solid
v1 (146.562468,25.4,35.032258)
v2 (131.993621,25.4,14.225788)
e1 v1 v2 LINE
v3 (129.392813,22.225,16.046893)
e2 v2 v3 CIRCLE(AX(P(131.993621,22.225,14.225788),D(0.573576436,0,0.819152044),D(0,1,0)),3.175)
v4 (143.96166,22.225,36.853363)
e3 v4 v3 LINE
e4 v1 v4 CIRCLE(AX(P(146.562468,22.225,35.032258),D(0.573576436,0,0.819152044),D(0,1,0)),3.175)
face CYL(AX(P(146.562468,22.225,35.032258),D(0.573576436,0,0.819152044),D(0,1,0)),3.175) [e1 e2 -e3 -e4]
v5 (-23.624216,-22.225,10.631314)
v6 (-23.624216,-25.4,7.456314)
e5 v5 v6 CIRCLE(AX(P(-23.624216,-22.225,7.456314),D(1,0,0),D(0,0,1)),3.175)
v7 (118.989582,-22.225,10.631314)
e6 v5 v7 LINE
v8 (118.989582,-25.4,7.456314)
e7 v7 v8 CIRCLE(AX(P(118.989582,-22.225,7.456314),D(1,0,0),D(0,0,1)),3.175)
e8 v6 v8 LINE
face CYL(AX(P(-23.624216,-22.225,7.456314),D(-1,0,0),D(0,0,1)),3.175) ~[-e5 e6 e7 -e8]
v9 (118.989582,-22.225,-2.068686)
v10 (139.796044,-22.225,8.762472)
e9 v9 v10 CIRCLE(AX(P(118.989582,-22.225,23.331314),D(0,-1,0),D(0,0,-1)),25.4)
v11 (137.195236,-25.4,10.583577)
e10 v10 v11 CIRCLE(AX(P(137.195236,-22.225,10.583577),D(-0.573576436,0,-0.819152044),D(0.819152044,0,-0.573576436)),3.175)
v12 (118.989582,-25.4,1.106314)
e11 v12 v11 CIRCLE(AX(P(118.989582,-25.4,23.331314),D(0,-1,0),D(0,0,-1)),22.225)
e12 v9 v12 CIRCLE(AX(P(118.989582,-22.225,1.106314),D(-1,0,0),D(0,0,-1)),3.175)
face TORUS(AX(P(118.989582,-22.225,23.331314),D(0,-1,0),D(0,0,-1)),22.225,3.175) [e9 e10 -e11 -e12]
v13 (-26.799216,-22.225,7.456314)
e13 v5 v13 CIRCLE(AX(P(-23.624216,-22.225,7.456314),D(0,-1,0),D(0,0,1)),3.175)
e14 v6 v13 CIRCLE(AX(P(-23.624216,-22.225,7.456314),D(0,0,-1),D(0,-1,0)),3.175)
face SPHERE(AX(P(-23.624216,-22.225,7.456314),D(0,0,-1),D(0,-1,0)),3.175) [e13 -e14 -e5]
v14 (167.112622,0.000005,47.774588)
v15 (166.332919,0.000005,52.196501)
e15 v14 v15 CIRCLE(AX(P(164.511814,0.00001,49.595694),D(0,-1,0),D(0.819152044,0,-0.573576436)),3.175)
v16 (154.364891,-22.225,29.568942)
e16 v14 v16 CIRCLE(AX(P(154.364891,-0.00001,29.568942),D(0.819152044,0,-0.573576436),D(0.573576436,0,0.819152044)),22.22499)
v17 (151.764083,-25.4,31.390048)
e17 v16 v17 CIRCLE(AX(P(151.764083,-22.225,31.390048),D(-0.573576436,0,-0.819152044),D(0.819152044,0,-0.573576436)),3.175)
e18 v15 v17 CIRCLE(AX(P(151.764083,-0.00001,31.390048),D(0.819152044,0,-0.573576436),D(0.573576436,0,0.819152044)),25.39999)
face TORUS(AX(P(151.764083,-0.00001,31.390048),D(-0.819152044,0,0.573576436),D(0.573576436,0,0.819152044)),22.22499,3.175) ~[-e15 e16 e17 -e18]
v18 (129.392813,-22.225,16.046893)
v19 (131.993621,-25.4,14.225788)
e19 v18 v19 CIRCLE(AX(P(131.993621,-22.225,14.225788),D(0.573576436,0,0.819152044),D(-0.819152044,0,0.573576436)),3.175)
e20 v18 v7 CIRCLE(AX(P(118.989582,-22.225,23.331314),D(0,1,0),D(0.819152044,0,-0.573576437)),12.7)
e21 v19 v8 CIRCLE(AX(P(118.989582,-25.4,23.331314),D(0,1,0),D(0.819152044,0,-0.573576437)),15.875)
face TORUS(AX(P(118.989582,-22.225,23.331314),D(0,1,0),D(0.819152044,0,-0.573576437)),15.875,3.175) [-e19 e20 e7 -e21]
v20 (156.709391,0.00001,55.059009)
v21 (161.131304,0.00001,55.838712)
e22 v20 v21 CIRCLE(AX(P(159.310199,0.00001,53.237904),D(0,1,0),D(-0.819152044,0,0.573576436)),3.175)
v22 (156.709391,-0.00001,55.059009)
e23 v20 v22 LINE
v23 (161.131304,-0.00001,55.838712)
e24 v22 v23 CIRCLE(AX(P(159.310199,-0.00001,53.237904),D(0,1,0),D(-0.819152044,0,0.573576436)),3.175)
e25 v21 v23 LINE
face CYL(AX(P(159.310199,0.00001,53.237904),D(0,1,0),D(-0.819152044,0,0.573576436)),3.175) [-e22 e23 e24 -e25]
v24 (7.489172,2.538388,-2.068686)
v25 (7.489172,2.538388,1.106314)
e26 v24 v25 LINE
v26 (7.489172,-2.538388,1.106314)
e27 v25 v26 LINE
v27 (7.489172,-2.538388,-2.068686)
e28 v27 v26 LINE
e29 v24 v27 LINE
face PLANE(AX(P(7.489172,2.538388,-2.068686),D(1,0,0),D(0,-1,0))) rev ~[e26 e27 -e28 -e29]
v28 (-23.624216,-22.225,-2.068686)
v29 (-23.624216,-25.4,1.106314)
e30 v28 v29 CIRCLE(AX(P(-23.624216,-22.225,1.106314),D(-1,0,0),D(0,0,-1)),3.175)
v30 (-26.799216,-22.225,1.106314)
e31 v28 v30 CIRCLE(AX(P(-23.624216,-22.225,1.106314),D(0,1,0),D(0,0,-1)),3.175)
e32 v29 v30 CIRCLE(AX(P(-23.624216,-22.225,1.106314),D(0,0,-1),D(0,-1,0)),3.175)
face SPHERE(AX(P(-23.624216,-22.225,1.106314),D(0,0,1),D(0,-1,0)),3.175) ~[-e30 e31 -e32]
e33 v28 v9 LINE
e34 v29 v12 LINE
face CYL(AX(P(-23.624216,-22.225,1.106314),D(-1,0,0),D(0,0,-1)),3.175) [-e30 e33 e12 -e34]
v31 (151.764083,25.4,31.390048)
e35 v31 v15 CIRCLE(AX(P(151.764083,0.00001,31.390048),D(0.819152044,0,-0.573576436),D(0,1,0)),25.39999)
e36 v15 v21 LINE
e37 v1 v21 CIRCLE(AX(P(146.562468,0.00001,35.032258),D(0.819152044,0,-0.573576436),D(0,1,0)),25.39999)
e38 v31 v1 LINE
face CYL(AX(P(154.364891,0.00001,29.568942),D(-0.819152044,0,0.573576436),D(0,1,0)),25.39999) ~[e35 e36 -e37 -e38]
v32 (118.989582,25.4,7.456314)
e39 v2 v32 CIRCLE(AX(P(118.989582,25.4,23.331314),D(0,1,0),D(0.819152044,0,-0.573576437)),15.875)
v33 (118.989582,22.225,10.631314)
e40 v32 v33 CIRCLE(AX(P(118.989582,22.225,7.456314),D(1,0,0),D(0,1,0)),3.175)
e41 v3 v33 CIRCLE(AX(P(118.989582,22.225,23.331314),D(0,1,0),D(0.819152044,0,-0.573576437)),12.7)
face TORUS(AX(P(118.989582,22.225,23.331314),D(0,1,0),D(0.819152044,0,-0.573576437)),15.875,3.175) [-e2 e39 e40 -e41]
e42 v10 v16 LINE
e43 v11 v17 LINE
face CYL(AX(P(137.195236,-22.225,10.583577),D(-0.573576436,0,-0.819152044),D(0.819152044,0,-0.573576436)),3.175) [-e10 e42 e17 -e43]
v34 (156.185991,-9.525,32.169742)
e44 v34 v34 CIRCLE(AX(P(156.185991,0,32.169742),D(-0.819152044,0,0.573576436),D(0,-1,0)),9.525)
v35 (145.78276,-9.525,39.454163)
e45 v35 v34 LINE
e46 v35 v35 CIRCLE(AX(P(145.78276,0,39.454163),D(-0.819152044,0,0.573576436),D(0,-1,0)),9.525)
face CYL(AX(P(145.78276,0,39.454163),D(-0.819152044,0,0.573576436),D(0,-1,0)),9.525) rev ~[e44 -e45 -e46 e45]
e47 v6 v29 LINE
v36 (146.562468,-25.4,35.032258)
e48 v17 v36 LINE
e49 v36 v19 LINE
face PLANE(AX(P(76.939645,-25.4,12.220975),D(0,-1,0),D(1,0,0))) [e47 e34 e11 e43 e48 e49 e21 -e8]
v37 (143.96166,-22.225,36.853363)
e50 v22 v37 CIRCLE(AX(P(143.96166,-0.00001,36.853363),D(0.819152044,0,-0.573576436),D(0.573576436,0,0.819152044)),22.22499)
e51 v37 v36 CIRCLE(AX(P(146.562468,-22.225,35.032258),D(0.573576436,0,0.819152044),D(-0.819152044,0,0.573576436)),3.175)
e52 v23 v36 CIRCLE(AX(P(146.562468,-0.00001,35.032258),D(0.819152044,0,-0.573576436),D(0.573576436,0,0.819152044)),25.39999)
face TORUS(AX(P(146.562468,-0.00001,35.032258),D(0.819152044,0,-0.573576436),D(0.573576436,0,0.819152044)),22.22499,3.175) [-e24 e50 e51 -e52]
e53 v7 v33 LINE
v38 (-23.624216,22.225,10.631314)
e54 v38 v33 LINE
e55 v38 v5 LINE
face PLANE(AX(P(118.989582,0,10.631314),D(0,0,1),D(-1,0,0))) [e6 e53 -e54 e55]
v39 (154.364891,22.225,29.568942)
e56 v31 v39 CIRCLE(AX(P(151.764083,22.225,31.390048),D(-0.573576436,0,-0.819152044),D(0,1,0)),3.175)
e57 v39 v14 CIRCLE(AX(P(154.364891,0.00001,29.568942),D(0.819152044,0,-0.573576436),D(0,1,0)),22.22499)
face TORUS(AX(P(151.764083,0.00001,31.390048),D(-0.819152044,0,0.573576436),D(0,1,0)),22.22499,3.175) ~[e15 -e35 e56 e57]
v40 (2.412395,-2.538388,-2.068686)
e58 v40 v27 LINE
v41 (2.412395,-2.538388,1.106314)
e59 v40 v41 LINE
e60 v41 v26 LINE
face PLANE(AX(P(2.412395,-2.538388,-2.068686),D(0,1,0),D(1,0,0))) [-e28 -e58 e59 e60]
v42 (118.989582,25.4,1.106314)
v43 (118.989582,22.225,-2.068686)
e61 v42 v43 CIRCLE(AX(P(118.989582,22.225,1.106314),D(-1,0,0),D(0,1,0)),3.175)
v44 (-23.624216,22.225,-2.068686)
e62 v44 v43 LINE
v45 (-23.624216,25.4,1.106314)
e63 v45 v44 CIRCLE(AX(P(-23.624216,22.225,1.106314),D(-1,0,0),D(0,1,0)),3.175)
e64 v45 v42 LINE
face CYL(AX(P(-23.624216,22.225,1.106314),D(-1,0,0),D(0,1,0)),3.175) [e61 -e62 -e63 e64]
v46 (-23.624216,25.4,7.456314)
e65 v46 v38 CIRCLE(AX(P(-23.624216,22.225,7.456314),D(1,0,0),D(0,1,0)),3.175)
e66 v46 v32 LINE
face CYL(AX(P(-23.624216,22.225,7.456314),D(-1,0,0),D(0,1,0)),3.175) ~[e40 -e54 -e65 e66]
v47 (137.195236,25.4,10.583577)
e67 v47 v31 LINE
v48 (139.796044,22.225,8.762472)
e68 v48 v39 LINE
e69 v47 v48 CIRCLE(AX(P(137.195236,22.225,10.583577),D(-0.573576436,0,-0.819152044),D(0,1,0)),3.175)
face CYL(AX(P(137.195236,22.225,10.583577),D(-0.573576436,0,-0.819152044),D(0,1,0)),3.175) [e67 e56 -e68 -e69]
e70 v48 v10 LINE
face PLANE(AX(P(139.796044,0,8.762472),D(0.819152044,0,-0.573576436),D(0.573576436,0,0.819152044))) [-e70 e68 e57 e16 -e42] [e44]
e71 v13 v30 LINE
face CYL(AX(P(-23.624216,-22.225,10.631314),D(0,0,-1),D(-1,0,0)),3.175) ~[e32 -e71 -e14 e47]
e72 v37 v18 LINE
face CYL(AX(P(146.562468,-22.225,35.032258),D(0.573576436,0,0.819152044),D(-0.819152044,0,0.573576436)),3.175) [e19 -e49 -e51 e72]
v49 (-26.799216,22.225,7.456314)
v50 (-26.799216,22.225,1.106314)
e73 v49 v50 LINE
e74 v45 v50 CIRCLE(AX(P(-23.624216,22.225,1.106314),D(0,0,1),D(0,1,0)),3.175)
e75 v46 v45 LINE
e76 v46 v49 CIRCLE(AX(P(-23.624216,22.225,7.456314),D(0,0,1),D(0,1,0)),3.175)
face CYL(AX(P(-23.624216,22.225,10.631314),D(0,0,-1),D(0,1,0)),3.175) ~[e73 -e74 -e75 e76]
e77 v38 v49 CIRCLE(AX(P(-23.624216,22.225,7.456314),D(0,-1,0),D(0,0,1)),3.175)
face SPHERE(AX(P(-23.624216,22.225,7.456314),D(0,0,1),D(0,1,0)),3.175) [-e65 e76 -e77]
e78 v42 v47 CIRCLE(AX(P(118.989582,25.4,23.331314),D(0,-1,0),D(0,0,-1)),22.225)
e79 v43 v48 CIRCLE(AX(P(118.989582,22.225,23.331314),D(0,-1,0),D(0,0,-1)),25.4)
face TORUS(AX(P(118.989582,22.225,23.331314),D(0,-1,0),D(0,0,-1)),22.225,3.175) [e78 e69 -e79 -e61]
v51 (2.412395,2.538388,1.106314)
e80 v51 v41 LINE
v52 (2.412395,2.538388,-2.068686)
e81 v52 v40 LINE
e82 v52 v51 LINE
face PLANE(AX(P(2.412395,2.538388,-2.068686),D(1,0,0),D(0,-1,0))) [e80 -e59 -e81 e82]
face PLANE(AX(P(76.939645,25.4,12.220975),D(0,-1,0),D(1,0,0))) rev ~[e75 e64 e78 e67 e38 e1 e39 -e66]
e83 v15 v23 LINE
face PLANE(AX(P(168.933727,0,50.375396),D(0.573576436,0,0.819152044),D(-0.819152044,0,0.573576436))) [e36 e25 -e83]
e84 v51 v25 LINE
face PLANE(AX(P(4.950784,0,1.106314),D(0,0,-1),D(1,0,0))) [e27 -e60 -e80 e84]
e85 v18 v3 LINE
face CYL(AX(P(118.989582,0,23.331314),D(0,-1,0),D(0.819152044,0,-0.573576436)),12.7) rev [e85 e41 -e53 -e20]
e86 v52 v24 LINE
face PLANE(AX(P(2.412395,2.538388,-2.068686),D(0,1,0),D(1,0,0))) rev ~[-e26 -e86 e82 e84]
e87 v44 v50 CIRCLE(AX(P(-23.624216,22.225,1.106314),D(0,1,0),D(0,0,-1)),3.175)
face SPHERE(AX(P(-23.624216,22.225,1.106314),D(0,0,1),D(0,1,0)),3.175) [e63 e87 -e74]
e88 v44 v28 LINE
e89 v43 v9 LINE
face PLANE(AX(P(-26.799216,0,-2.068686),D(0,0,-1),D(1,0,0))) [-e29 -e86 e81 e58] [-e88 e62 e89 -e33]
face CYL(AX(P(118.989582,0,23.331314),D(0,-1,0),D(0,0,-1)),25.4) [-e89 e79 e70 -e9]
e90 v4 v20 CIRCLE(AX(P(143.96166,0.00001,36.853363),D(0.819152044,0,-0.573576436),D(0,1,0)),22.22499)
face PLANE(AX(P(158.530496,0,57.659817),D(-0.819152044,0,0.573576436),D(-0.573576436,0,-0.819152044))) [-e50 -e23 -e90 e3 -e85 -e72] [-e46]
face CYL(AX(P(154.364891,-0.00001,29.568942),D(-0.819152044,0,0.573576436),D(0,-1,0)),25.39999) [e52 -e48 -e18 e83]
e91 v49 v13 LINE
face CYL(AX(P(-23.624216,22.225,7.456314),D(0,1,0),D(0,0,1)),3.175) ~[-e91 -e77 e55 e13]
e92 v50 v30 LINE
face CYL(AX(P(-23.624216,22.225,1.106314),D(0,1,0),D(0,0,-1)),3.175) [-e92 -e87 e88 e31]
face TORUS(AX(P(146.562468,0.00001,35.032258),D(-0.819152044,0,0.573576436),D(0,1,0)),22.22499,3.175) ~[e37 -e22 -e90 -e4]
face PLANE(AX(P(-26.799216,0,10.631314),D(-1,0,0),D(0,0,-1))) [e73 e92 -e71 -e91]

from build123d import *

# Parameters (mm, degrees)
F1_DEPTH     = 25.4
F2_R         = 9.525
F3_DEPTH     = 42.7816898715
F4_R         = 25.39999
F5_R         = 3.175
F6_W         = 5.0767767243
F6_H         = 5.0767767243
F7_DEPTH     = 3.175
F8_T1_DEPTH  = 142.613798458
F8_T3_DEPTH  = 25.40001
F8_T5_DEPTH  = 44.45
F8_T7_DEPTH  = 25.40001
F8_T9_DEPTH  = 2e-05
F8_T12_ANGLE = 90
F8_T14_ANGLE = 55
F8_T16_ANGLE = 55
F8_T18_ANGLE = 90
F8_T20_ANGLE = 90
F8_T22_ANGLE = 90
F8_T24_ANGLE = 55
F8_T26_ANGLE = 90
F8_T28_ANGLE = 90
F8_T30_ANGLE = 90
F8_T32_ANGLE = 55
F8_T34_ANGLE = 90


# Not quite as in the source:
# - a fillet or chamfer that OpenCascade refuses, or shapes differently, is made with other operations: its cross-section is extruded or revolved along the edge and cut away or added
# - a fillet or chamfer is up to 0.001 mm smaller than in the source, because OpenCascade refuses the exact size


with BuildPart() as f1:
    # F0 (on Front) → F1 (new body, symmetric)
    with BuildSketch(Plane.XZ):
        with BuildLine():
            Line((118.9895820573, 10.6313137069), (-26.7992164007, 10.6313137069))
            Line((-26.7992164007, 10.6313137069), (-26.7992164007, -2.0686862931))
            Line((-26.7992164007, -2.0686862931), (118.9895820573, -2.0686862931))
            ThreePointArc((118.9895820573, -2.0686862931), (130.7179968335, 0.8012385441), (139.7960439822, 8.7624722235))
            Line((139.7960439822, 8.7624722235), (168.9337269489, 50.3753960734))
            Line((168.9337269489, 50.3753960734), (158.5304959864, 57.6598168151))
            Line((158.5304959864, 57.6598168151), (129.3928130198, 16.0468929652))
            ThreePointArc((129.3928130198, 16.0468929652), (124.8537894454, 12.0662761255), (118.9895820573, 10.6313137069))
        make_face()
    extrude(amount=F1_DEPTH, both=True)

    # F2 (on face) → F3 (cut, through all)
    with BuildSketch(Plane(origin=(79.2843072841, 0, -55.515469622), x_dir=(0, -1, 0), z_dir=(-0.8191520443, 0, 0.5735764364))):
        with Locations((0, 115.9365137582)):
            Circle(F2_R)
    extrude(amount=-F3_DEPTH, mode=Mode.SUBTRACT)

    # F4 (radius 25.4 in the source; OpenCascade refuses exactly that, so slightly less here)
    f4_edges = [f1.edges().sort_by_distance(p)[0] for p in [
        (163.732111, 25.4, 54.017606),
        (163.732111, -25.4, 54.017606),
    ]]
    fillet(f4_edges, radius=F4_R)

    # F5
    f5_edges = [f1.edges().sort_by_distance(p)[0] for p in [
        (-26.799216, -25.4, 4.281314),
        (-26.799216, 25.4, 4.281314),
    ]]
    fillet(f5_edges, radius=F5_R)

    # F6 (on face) → F7 (cut)
    with BuildSketch(Plane(origin=(0, 0, -2.0686862931), x_dir=(1, 0, 0), z_dir=(0, 0, -1))):
        with Locations((4.9507835993, 0)):
            Rectangle(F6_W, F6_H)
    extrude(amount=-F7_DEPTH, mode=Mode.SUBTRACT)

    # F8: fillet of radius 3.175 on 24 edges, made by hand

    # F8_s2 → F8_t1 (cut)
    with BuildSketch(Plane.YZ.offset(-23.6242164007)):
        with BuildLine():
            ThreePointArc((25.4, 7.4563137069), (24.4700640303, 9.7013777371), (22.225, 10.6313137069))
            Line((22.225, 10.6313137069), (25.4, 10.6313137069))
            Line((25.4, 10.6313137069), (25.4, 7.4563137069))
        make_face()
        with BuildLine():
            ThreePointArc((-22.225, 10.6313137069), (-24.4700640303, 9.7013777371), (-25.4, 7.4563137069))
            Line((-25.4, 7.4563137069), (-25.4, 10.6313137069))
            Line((-25.4, 10.6313137069), (-22.225, 10.6313137069))
        make_face()
        with BuildLine():
            ThreePointArc((-22.225, -2.0686862931), (-24.4700640303, -1.1387503234), (-25.4, 1.1063137069))
            Line((-25.4, 1.1063137069), (-25.4, -2.0686862931))
            Line((-25.4, -2.0686862931), (-22.225, -2.0686862931))
        make_face()
        with BuildLine():
            ThreePointArc((25.4, 1.1063137069), (24.4700640303, -1.1387503234), (22.225, -2.0686862931))
            Line((22.225, -2.0686862931), (25.4, -2.0686862931))
            Line((25.4, -2.0686862931), (25.4, 1.1063137069))
        make_face()
    extrude(amount=F8_T1_DEPTH, mode=Mode.SUBTRACT)

    # F8_s4 → F8_t3 (cut)
    with BuildSketch(Plane(origin=(64.6773529548, 0, 92.3688327037), x_dir=(0, 1, 0), z_dir=(-0.5735764364, 0, -0.8191520443))):
        with BuildLine():
            ThreePointArc((25.4, 99.96326762), (24.4700640303, 97.7182035897), (22.225, 96.78826762))
            Line((22.225, 96.78826762), (25.4, 96.78826762))
            Line((25.4, 96.78826762), (25.4, 99.96326762))
        make_face()
        with BuildLine():
            ThreePointArc((-22.225, 96.78826762), (-24.4700640303, 97.7182035897), (-25.4, 99.96326762))
            Line((-25.4, 99.96326762), (-25.4, 96.78826762))
            Line((-25.4, 96.78826762), (-22.225, 96.78826762))
        make_face()
    extrude(amount=F8_T3_DEPTH, mode=Mode.SUBTRACT)

    # F8_s6 → F8_t5 (cut)
    with BuildSketch(Plane.XZ.offset(-22.225)):
        with BuildLine():
            ThreePointArc((-23.6242164007, 10.6313137069), (-25.869280431, 9.7013777371), (-26.7992164007, 7.4563137069))
            Line((-26.7992164007, 7.4563137069), (-26.7992164007, 10.6313137069))
            Line((-26.7992164007, 10.6313137069), (-23.6242164007, 10.6313137069))
        make_face()
        with BuildLine():
            ThreePointArc((-23.6242164007, -2.0686862931), (-25.869280431, -1.1387503234), (-26.7992164007, 1.1063137069))
            Line((-26.7992164007, 1.1063137069), (-26.7992164007, -2.0686862931))
            Line((-26.7992164007, -2.0686862931), (-23.6242164007, -2.0686862931))
        make_face()
    extrude(amount=F8_T5_DEPTH, mode=Mode.SUBTRACT)

    # F8_s8 → F8_t7 (cut)
    with BuildSketch(Plane(origin=(50.1085057357, 0, 71.5623625873), x_dir=(0, 1, 0), z_dir=(0.5735764364, 0, 0.8191520443))):
        with BuildLine():
            ThreePointArc((25.4, -106.31326762), (24.4700640303, -108.5583316502), (22.225, -109.48826762))
            Line((22.225, -109.48826762), (25.4, -109.48826762))
            Line((25.4, -109.48826762), (25.4, -106.31326762))
        make_face()
        with BuildLine():
            ThreePointArc((-22.225, -109.48826762), (-24.4700640303, -108.5583316502), (-25.4, -106.31326762))
            Line((-25.4, -106.31326762), (-25.4, -109.48826762))
            Line((-25.4, -109.48826762), (-22.225, -109.48826762))
        make_face()
    extrude(amount=F8_T7_DEPTH, mode=Mode.SUBTRACT)

    # F8_s10 → F8_t9 (cut)
    with BuildSketch(Plane.XZ.offset(-1e-05)):
        with BuildLine():
            ThreePointArc((167.1126217635, 47.7745883328), (167.6385786386, 50.1470264823), (166.3329192083, 52.1965012588))
            Line((166.3329192083, 52.1965012588), (168.9337269489, 50.3753960734))
            Line((168.9337269489, 50.3753960734), (167.1126217635, 47.7745883328))
        make_face()
        with BuildLine():
            ThreePointArc((156.709390801, 55.0590090745), (158.7588655775, 56.3646685049), (161.131303727, 55.8387116297))
            Line((161.131303727, 55.8387116297), (158.5304959864, 57.6598168151))
            Line((158.5304959864, 57.6598168151), (156.709390801, 55.0590090745))
        make_face()
    extrude(amount=F8_T9_DEPTH, mode=Mode.SUBTRACT)

    # F8_s11 → F8_t12 (revolve, cut)
    with BuildSketch(Plane(origin=(64.6773529548, 0, 92.3688327037), x_dir=(0, 1, 0), z_dir=(-0.5735764364, 0, -0.8191520443))):
        with BuildLine():
            ThreePointArc((25.4, 99.96326762), (24.4700640303, 97.7182035897), (22.225, 96.78826762))
            Line((22.225, 96.78826762), (25.4, 96.78826762))
            Line((25.4, 96.78826762), (25.4, 99.96326762))
        make_face()
    revolve(axis=Axis((143.9616602388, 1e-05, 36.8533630817), (0.8191520443, 0, -0.5735764364)), revolution_arc=F8_T12_ANGLE, mode=Mode.SUBTRACT)

    # F8_s13 → F8_t14 (revolve, cut)
    with BuildSketch(Plane.YZ.offset(118.9895820573)):
        with BuildLine():
            ThreePointArc((25.4, 1.1063137069), (24.4700640303, -1.1387503234), (22.225, -2.0686862931))
            Line((22.225, -2.0686862931), (25.4, -2.0686862931))
            Line((25.4, -2.0686862931), (25.4, 1.1063137069))
        make_face()
    revolve(axis=Axis((118.9895820573, 25.4, 23.3313137069), (0, -1, 0)), revolution_arc=F8_T14_ANGLE, mode=Mode.SUBTRACT)

    # F8_s15 → F8_t16 (revolve, cut)
    with BuildSketch(Plane(origin=(50.1085057357, 0, 71.5623625873), x_dir=(0, 1, 0), z_dir=(0.5735764364, 0, 0.8191520443))):
        with BuildLine():
            ThreePointArc((25.4, -99.96326762), (24.4700640303, -97.7182035897), (22.225, -96.78826762))
            Line((22.225, -96.78826762), (25.4, -96.78826762))
            Line((25.4, -96.78826762), (25.4, -99.96326762))
        make_face()
    revolve(axis=Axis((118.9895820573, 25.4, 23.3313137069), (0, 1, 0)), revolution_arc=F8_T16_ANGLE, mode=Mode.SUBTRACT)

    # F8_s17 → F8_t18 (revolve, cut)
    with BuildSketch(Plane.YZ.offset(-23.6242164007)):
        with BuildLine():
            ThreePointArc((22.225, -2.0686862931), (24.4700640303, -1.1387503234), (25.4, 1.1063137069))
            Line((25.4, 1.1063137069), (25.4, -2.0686862931))
            Line((25.4, -2.0686862931), (22.225, -2.0686862931))
        make_face()
    revolve(axis=Axis((-23.6242164007, 22.225, -2.0686862931), (0, 0, 1)), revolution_arc=F8_T18_ANGLE, mode=Mode.SUBTRACT)

    # F8_s19 → F8_t20 (revolve, cut)
    with BuildSketch(Plane.YZ.offset(-23.6242164007)):
        with BuildLine():
            ThreePointArc((-22.225, -2.0686862931), (-24.4700640303, -1.1387503234), (-25.4, 1.1063137069))
            Line((-25.4, 1.1063137069), (-25.4, -2.0686862931))
            Line((-25.4, -2.0686862931), (-22.225, -2.0686862931))
        make_face()
    revolve(axis=Axis((-23.6242164007, -22.225, -2.0686862931), (0, 0, -1)), revolution_arc=F8_T20_ANGLE, mode=Mode.SUBTRACT)

    # F8_s21 → F8_t22 (revolve, cut)
    with BuildSketch(Plane.YZ.offset(-23.6242164007)):
        with BuildLine():
            ThreePointArc((25.4, 7.4563137069), (24.4700640303, 9.7013777371), (22.225, 10.6313137069))
            Line((22.225, 10.6313137069), (25.4, 10.6313137069))
            Line((25.4, 10.6313137069), (25.4, 7.4563137069))
        make_face()
    revolve(axis=Axis((-23.6242164007, 22.225, 10.6313137069), (0, 0, 1)), revolution_arc=F8_T22_ANGLE, mode=Mode.SUBTRACT)

    # F8_s23 → F8_t24 (revolve, cut)
    with BuildSketch(Plane.YZ.offset(118.9895820573)):
        with BuildLine():
            ThreePointArc((-22.225, -2.0686862931), (-24.4700640303, -1.1387503234), (-25.4, 1.1063137069))
            Line((-25.4, 1.1063137069), (-25.4, -2.0686862931))
            Line((-25.4, -2.0686862931), (-22.225, -2.0686862931))
        make_face()
    revolve(axis=Axis((118.9895820573, -25.4, 23.3313137069), (0, -1, 0)), revolution_arc=F8_T24_ANGLE, mode=Mode.SUBTRACT)

    # F8_s25 → F8_t26 (revolve, cut)
    with BuildSketch(Plane.YZ.offset(-23.6242164007)):
        with BuildLine():
            ThreePointArc((-22.225, 10.6313137069), (-24.4700640303, 9.7013777371), (-25.4, 7.4563137069))
            Line((-25.4, 7.4563137069), (-25.4, 10.6313137069))
            Line((-25.4, 10.6313137069), (-22.225, 10.6313137069))
        make_face()
    revolve(axis=Axis((-23.6242164007, -22.225, 10.6313137069), (0, 0, -1)), revolution_arc=F8_T26_ANGLE, mode=Mode.SUBTRACT)

    # F8_s27 → F8_t28 (revolve, cut)
    with BuildSketch(Plane(origin=(64.6773529548, 0, 92.3688327037), x_dir=(0, 1, 0), z_dir=(-0.5735764364, 0, -0.8191520443))):
        with BuildLine():
            ThreePointArc((22.225, 109.48826762), (24.4700640303, 108.5583316502), (25.4, 106.31326762))
            Line((25.4, 106.31326762), (25.4, 109.48826762))
            Line((25.4, 109.48826762), (22.225, 109.48826762))
        make_face()
    revolve(axis=Axis((154.3648912013, 1e-05, 29.56894234), (0.8191520443, 0, -0.5735764364)), revolution_arc=F8_T28_ANGLE, mode=Mode.SUBTRACT)

    # F8_s29 → F8_t30 (revolve, cut)
    with BuildSketch(Plane.XZ.offset(1e-05)):
        with BuildLine():
            ThreePointArc((167.1126217635, 47.7745883328), (167.6385786386, 50.1470264823), (166.3329192083, 52.1965012588))
            Line((166.3329192083, 52.1965012588), (168.9337269489, 50.3753960734))
            Line((168.9337269489, 50.3753960734), (167.1126217635, 47.7745883328))
        make_face()
    revolve(axis=Axis((154.3648912013, -1e-05, 29.56894234), (0.8191520443, 0, -0.5735764364)), revolution_arc=F8_T30_ANGLE, mode=Mode.SUBTRACT)

    # F8_s31 → F8_t32 (revolve, cut)
    with BuildSketch(Plane(origin=(50.1085057357, 0, 71.5623625873), x_dir=(0, 1, 0), z_dir=(0.5735764364, 0, 0.8191520443))):
        with BuildLine():
            ThreePointArc((-22.225, -96.78826762), (-24.4700640303, -97.7182035897), (-25.4, -99.96326762))
            Line((-25.4, -99.96326762), (-25.4, -96.78826762))
            Line((-25.4, -96.78826762), (-22.225, -96.78826762))
        make_face()
    revolve(axis=Axis((118.9895820573, -25.4, 23.3313137069), (0, 1, 0)), revolution_arc=F8_T32_ANGLE, mode=Mode.SUBTRACT)

    # F8_s33 → F8_t34 (revolve, cut)
    with BuildSketch(Plane.XZ.offset(1e-05)):
        with BuildLine():
            ThreePointArc((156.709390801, 55.0590090745), (158.7588655775, 56.3646685049), (161.131303727, 55.8387116297))
            Line((161.131303727, 55.8387116297), (158.5304959864, 57.6598168151))
            Line((158.5304959864, 57.6598168151), (156.709390801, 55.0590090745))
        make_face()
    revolve(axis=Axis((143.9616602388, -1e-05, 36.8533630817), (0.8191520443, 0, -0.5735764364)), revolution_arc=F8_T34_ANGLE, mode=Mode.SUBTRACT)


solid = f1.part
